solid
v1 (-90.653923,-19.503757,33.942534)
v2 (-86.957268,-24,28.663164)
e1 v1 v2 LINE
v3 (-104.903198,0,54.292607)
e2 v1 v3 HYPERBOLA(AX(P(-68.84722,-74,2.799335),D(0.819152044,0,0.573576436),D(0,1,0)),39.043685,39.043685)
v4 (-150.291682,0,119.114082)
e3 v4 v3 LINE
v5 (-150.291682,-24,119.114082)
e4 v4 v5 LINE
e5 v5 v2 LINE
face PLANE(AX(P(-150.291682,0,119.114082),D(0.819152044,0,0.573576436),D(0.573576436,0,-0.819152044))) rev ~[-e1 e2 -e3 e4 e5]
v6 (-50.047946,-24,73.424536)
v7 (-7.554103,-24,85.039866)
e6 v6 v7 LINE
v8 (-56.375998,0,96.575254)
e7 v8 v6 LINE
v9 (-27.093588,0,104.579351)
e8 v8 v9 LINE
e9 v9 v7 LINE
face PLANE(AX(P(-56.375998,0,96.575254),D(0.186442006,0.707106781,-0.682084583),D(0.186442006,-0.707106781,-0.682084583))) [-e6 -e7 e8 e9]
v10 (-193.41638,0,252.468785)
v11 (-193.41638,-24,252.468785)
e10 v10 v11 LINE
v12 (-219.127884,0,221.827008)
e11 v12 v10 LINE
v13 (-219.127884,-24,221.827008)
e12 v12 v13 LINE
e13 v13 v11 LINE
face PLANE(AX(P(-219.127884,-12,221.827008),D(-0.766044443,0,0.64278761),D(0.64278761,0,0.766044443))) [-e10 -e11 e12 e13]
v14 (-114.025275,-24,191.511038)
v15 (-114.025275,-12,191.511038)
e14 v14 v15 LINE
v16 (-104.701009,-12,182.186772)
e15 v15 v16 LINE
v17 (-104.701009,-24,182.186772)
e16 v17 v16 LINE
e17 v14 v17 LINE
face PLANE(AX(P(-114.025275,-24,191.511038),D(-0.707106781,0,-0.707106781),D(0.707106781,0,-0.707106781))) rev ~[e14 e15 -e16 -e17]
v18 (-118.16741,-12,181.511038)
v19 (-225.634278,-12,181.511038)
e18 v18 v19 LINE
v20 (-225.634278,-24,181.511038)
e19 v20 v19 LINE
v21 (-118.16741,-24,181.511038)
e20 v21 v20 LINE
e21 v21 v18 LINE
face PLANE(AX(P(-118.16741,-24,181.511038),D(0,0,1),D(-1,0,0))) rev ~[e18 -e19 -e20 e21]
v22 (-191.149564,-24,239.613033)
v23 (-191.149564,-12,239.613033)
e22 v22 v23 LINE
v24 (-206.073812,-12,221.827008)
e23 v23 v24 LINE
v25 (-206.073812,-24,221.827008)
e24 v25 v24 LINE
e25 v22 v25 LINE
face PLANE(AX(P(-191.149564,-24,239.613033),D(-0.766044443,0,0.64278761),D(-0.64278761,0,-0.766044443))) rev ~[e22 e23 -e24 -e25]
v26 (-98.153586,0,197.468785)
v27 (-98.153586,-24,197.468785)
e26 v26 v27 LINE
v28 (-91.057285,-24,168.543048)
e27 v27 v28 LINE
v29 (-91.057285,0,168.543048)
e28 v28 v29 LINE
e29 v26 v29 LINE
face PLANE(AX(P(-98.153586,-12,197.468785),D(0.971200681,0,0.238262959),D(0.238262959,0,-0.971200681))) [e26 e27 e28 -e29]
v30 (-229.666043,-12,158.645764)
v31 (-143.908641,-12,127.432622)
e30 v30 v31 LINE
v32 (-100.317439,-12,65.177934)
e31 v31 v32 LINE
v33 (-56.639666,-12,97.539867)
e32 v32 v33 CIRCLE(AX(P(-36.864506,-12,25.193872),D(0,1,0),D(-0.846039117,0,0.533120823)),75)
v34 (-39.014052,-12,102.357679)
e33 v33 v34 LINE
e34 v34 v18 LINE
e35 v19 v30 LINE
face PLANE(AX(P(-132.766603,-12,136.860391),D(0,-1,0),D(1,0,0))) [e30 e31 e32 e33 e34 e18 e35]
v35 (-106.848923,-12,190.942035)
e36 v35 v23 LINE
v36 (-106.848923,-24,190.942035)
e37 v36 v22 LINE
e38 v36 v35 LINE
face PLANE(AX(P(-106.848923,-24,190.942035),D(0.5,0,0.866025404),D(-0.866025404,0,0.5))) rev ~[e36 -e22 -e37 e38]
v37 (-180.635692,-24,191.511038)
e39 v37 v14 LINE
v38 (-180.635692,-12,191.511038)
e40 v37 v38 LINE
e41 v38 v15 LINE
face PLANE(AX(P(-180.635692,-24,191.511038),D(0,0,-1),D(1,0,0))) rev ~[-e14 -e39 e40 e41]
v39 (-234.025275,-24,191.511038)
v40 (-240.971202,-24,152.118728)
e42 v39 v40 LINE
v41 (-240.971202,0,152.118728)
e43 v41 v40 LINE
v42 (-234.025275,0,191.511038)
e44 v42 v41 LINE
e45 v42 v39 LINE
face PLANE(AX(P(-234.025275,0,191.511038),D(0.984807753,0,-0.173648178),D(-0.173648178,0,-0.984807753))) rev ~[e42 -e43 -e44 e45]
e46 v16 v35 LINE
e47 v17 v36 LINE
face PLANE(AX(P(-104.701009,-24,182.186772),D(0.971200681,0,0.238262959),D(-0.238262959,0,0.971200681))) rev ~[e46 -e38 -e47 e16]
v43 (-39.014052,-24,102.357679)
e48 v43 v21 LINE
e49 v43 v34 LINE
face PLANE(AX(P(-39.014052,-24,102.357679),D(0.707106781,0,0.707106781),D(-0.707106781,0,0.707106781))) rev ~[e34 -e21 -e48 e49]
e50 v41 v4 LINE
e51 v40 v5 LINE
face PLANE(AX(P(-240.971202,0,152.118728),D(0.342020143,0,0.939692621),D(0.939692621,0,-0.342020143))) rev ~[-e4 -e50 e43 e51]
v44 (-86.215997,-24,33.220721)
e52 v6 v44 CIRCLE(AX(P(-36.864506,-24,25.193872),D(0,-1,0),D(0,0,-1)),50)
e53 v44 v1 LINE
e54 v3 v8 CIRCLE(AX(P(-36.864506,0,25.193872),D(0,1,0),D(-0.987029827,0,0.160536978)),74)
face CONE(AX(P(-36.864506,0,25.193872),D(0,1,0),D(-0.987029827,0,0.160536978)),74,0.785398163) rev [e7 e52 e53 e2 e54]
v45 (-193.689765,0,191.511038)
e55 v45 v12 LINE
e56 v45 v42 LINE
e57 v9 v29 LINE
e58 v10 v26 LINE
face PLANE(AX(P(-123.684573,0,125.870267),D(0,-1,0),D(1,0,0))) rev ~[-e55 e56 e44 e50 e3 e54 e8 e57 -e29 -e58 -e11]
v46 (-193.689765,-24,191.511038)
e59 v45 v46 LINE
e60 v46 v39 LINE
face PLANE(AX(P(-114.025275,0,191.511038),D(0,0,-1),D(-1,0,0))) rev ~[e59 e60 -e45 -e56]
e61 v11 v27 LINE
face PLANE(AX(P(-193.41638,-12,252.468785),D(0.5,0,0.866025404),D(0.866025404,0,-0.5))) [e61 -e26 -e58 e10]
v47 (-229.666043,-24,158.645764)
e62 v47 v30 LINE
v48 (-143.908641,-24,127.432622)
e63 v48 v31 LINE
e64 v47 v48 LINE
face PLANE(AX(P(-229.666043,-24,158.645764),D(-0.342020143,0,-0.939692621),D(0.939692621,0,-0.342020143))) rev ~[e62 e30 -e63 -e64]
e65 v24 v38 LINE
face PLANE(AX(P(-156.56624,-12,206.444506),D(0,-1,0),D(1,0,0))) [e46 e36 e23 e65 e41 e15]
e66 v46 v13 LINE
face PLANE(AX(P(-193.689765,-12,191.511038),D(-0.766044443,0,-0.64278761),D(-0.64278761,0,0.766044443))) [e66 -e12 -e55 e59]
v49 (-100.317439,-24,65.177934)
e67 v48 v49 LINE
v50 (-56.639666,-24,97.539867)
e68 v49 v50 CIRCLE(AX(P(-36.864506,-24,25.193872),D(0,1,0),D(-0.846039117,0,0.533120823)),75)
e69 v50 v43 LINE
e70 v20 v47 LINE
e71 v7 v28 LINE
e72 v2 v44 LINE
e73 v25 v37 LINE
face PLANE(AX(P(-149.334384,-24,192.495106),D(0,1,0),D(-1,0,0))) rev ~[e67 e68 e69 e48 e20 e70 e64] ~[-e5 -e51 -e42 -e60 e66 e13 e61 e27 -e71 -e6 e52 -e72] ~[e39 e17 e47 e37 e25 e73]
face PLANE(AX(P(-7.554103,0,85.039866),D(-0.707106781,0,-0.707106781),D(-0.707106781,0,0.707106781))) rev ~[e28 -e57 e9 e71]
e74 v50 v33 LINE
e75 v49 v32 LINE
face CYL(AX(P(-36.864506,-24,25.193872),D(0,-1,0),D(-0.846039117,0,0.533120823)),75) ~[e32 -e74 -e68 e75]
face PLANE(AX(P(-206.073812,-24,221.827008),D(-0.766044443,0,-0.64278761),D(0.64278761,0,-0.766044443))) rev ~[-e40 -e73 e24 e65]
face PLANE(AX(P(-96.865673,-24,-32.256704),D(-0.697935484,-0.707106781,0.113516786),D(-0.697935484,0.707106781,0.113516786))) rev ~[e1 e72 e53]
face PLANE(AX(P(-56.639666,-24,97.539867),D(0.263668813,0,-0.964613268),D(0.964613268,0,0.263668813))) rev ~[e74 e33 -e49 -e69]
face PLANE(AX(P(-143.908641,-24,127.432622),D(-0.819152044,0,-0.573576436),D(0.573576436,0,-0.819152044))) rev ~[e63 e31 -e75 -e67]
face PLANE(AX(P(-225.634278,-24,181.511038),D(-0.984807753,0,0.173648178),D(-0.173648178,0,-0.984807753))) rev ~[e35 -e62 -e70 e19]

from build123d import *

# Parameters (mm, degrees)
F1_DEPTH    = 24
F2_R        = 50
F3_T1_DEPTH = 105.7731172378
F3_T3_DEPTH = 66.3378383392
F3_T6_ANGLE = 65.4740658064
F6_DEPTH    = 12
F8_DEPTH    = 12
F9_DEPTH    = 12
F11_DEPTH   = 12


# Not quite as in the source:
# - a fillet or chamfer that OpenCascade refuses, or shapes differently, is made with other operations: its cross-section is extruded or revolved along the edge and cut away or added


with BuildPart() as f1:
    # F0 (on Front) → F1 (new body)
    with BuildSketch(Plane.XZ):
        Polygon((-81.055521965, 64.9488791823), (-7.5541026236, 85.0398655279), (-114.0252747561, 191.5110376604), (-234.0252747561, 191.5110376604), (-240.9712018628, 152.1187275399), (-150.2916823338, 119.1140815738), (-86.9572677666, 28.6631636514), align=None)
    extrude(amount=F1_DEPTH)

    # F2
    f2_edges = [f1.edges().sort_by_distance(p)[0] for p in [
        (-81.055522, -12, 64.948879),
    ]]
    fillet(f2_edges, radius=F2_R)

    # F3: chamfer of 24 on 2 edges, made by hand

    # F3_s2 → F3_t1 (cut)
    with BuildSketch(Plane(origin=(-27.8938692058, 0, -7.6245513401), x_dir=(0, 1, 0), z_dir=(0.9646132681, 0, 0.2636688131))):
        Polygon((0, 108.0223638788), (-24, 84.0223638788), (0, 84.0223638788), align=None)
    extrude(amount=F3_T1_DEPTH, mode=Mode.SUBTRACT)

    # F3_s4 → F3_t3 (cut)
    with BuildSketch(Plane(origin=(-7.6076630021, 0, -46.7742096713), x_dir=(0, 1, 0), z_dir=(0.1605369785, 0, 0.9870298266))):
        Polygon((-24, 90.4309146097), (0, 114.4309146097), (0, 90.4309146097), align=None)
    extrude(amount=F3_T3_DEPTH, mode=Mode.SUBTRACT)

    # F3_s5 → F3_t6 (revolve, cut)
    with BuildSketch(Plane(origin=(3.0420131267, 0, 18.7032153992), x_dir=(0, 1, 0), z_dir=(-0.1605369785, 0, -0.9870298266))):
        Polygon((0, -114.4309146097), (-24, -90.4309146097), (0, -90.4309146097), align=None)
    revolve(axis=Axis((-36.8645055082, 0, 25.1938722697), (0, 1, 0)), revolution_arc=F3_T6_ANGLE, mode=Mode.SUBTRACT)

    # F5 (on face) → F6 (join)
    with BuildSketch(Plane(origin=(0, 0, 0), x_dir=(-1, 0, 0), z_dir=(0, 1, 0))):
        Polygon((84.0423926711, 139.9491429329), (163.5881303991, 155.6373062127), (219.1278844576, 221.8270076437), (193.4163800701, 252.4687853684), (98.1535856538, 197.4687853684), align=None)
    extrude(amount=-F6_DEPTH)

    # F7 (on face) → F8 (cut)
    with BuildSketch(Plane.XZ.offset(24)):
        with BuildLine():
            Line((-143.908641448, 127.432622412), (-100.3174393188, 65.1779339797))
            ThreePointArc((-100.3174393188, 65.1779339797), (-81.5137230154, 85.4553639206), (-56.6396664901, 97.5398673775))
            Line((-56.6396664901, 97.5398673775), (-39.014051648, 102.3576789286))
            Line((-39.014051648, 102.3576789286), (-118.1674103798, 181.5110376604))
            Line((-118.1674103798, 181.5110376604), (-225.6342784443, 181.5110376604))
            Line((-225.6342784443, 181.5110376604), (-229.6660431143, 158.6457639866))
            Line((-229.6660431143, 158.6457639866), (-143.908641448, 127.432622412))
        make_face()
    extrude(amount=-F8_DEPTH, mode=Mode.SUBTRACT)

    # F9 (add): a face of the model
    f9_faces = [f1.faces().sort_by_distance(p)[0] for p in [
        (-164.1324178165, -12, 212.498446066),
    ]]
    extrude(f9_faces, amount=F9_DEPTH)

    # F10 (on face) → F11 (cut)
    with BuildSketch(Plane.XZ.offset(24)):
        Polygon((-104.7010093218, 182.1867722261), (-106.848922609, 190.9420351164), (-191.149564101, 239.6130331747), (-206.0738115642, 221.8270076437), (-180.6356923325, 191.5110376604), (-114.0252747561, 191.5110376604), align=None)
    extrude(amount=-F11_DEPTH, mode=Mode.SUBTRACT)


solid = f1.part
